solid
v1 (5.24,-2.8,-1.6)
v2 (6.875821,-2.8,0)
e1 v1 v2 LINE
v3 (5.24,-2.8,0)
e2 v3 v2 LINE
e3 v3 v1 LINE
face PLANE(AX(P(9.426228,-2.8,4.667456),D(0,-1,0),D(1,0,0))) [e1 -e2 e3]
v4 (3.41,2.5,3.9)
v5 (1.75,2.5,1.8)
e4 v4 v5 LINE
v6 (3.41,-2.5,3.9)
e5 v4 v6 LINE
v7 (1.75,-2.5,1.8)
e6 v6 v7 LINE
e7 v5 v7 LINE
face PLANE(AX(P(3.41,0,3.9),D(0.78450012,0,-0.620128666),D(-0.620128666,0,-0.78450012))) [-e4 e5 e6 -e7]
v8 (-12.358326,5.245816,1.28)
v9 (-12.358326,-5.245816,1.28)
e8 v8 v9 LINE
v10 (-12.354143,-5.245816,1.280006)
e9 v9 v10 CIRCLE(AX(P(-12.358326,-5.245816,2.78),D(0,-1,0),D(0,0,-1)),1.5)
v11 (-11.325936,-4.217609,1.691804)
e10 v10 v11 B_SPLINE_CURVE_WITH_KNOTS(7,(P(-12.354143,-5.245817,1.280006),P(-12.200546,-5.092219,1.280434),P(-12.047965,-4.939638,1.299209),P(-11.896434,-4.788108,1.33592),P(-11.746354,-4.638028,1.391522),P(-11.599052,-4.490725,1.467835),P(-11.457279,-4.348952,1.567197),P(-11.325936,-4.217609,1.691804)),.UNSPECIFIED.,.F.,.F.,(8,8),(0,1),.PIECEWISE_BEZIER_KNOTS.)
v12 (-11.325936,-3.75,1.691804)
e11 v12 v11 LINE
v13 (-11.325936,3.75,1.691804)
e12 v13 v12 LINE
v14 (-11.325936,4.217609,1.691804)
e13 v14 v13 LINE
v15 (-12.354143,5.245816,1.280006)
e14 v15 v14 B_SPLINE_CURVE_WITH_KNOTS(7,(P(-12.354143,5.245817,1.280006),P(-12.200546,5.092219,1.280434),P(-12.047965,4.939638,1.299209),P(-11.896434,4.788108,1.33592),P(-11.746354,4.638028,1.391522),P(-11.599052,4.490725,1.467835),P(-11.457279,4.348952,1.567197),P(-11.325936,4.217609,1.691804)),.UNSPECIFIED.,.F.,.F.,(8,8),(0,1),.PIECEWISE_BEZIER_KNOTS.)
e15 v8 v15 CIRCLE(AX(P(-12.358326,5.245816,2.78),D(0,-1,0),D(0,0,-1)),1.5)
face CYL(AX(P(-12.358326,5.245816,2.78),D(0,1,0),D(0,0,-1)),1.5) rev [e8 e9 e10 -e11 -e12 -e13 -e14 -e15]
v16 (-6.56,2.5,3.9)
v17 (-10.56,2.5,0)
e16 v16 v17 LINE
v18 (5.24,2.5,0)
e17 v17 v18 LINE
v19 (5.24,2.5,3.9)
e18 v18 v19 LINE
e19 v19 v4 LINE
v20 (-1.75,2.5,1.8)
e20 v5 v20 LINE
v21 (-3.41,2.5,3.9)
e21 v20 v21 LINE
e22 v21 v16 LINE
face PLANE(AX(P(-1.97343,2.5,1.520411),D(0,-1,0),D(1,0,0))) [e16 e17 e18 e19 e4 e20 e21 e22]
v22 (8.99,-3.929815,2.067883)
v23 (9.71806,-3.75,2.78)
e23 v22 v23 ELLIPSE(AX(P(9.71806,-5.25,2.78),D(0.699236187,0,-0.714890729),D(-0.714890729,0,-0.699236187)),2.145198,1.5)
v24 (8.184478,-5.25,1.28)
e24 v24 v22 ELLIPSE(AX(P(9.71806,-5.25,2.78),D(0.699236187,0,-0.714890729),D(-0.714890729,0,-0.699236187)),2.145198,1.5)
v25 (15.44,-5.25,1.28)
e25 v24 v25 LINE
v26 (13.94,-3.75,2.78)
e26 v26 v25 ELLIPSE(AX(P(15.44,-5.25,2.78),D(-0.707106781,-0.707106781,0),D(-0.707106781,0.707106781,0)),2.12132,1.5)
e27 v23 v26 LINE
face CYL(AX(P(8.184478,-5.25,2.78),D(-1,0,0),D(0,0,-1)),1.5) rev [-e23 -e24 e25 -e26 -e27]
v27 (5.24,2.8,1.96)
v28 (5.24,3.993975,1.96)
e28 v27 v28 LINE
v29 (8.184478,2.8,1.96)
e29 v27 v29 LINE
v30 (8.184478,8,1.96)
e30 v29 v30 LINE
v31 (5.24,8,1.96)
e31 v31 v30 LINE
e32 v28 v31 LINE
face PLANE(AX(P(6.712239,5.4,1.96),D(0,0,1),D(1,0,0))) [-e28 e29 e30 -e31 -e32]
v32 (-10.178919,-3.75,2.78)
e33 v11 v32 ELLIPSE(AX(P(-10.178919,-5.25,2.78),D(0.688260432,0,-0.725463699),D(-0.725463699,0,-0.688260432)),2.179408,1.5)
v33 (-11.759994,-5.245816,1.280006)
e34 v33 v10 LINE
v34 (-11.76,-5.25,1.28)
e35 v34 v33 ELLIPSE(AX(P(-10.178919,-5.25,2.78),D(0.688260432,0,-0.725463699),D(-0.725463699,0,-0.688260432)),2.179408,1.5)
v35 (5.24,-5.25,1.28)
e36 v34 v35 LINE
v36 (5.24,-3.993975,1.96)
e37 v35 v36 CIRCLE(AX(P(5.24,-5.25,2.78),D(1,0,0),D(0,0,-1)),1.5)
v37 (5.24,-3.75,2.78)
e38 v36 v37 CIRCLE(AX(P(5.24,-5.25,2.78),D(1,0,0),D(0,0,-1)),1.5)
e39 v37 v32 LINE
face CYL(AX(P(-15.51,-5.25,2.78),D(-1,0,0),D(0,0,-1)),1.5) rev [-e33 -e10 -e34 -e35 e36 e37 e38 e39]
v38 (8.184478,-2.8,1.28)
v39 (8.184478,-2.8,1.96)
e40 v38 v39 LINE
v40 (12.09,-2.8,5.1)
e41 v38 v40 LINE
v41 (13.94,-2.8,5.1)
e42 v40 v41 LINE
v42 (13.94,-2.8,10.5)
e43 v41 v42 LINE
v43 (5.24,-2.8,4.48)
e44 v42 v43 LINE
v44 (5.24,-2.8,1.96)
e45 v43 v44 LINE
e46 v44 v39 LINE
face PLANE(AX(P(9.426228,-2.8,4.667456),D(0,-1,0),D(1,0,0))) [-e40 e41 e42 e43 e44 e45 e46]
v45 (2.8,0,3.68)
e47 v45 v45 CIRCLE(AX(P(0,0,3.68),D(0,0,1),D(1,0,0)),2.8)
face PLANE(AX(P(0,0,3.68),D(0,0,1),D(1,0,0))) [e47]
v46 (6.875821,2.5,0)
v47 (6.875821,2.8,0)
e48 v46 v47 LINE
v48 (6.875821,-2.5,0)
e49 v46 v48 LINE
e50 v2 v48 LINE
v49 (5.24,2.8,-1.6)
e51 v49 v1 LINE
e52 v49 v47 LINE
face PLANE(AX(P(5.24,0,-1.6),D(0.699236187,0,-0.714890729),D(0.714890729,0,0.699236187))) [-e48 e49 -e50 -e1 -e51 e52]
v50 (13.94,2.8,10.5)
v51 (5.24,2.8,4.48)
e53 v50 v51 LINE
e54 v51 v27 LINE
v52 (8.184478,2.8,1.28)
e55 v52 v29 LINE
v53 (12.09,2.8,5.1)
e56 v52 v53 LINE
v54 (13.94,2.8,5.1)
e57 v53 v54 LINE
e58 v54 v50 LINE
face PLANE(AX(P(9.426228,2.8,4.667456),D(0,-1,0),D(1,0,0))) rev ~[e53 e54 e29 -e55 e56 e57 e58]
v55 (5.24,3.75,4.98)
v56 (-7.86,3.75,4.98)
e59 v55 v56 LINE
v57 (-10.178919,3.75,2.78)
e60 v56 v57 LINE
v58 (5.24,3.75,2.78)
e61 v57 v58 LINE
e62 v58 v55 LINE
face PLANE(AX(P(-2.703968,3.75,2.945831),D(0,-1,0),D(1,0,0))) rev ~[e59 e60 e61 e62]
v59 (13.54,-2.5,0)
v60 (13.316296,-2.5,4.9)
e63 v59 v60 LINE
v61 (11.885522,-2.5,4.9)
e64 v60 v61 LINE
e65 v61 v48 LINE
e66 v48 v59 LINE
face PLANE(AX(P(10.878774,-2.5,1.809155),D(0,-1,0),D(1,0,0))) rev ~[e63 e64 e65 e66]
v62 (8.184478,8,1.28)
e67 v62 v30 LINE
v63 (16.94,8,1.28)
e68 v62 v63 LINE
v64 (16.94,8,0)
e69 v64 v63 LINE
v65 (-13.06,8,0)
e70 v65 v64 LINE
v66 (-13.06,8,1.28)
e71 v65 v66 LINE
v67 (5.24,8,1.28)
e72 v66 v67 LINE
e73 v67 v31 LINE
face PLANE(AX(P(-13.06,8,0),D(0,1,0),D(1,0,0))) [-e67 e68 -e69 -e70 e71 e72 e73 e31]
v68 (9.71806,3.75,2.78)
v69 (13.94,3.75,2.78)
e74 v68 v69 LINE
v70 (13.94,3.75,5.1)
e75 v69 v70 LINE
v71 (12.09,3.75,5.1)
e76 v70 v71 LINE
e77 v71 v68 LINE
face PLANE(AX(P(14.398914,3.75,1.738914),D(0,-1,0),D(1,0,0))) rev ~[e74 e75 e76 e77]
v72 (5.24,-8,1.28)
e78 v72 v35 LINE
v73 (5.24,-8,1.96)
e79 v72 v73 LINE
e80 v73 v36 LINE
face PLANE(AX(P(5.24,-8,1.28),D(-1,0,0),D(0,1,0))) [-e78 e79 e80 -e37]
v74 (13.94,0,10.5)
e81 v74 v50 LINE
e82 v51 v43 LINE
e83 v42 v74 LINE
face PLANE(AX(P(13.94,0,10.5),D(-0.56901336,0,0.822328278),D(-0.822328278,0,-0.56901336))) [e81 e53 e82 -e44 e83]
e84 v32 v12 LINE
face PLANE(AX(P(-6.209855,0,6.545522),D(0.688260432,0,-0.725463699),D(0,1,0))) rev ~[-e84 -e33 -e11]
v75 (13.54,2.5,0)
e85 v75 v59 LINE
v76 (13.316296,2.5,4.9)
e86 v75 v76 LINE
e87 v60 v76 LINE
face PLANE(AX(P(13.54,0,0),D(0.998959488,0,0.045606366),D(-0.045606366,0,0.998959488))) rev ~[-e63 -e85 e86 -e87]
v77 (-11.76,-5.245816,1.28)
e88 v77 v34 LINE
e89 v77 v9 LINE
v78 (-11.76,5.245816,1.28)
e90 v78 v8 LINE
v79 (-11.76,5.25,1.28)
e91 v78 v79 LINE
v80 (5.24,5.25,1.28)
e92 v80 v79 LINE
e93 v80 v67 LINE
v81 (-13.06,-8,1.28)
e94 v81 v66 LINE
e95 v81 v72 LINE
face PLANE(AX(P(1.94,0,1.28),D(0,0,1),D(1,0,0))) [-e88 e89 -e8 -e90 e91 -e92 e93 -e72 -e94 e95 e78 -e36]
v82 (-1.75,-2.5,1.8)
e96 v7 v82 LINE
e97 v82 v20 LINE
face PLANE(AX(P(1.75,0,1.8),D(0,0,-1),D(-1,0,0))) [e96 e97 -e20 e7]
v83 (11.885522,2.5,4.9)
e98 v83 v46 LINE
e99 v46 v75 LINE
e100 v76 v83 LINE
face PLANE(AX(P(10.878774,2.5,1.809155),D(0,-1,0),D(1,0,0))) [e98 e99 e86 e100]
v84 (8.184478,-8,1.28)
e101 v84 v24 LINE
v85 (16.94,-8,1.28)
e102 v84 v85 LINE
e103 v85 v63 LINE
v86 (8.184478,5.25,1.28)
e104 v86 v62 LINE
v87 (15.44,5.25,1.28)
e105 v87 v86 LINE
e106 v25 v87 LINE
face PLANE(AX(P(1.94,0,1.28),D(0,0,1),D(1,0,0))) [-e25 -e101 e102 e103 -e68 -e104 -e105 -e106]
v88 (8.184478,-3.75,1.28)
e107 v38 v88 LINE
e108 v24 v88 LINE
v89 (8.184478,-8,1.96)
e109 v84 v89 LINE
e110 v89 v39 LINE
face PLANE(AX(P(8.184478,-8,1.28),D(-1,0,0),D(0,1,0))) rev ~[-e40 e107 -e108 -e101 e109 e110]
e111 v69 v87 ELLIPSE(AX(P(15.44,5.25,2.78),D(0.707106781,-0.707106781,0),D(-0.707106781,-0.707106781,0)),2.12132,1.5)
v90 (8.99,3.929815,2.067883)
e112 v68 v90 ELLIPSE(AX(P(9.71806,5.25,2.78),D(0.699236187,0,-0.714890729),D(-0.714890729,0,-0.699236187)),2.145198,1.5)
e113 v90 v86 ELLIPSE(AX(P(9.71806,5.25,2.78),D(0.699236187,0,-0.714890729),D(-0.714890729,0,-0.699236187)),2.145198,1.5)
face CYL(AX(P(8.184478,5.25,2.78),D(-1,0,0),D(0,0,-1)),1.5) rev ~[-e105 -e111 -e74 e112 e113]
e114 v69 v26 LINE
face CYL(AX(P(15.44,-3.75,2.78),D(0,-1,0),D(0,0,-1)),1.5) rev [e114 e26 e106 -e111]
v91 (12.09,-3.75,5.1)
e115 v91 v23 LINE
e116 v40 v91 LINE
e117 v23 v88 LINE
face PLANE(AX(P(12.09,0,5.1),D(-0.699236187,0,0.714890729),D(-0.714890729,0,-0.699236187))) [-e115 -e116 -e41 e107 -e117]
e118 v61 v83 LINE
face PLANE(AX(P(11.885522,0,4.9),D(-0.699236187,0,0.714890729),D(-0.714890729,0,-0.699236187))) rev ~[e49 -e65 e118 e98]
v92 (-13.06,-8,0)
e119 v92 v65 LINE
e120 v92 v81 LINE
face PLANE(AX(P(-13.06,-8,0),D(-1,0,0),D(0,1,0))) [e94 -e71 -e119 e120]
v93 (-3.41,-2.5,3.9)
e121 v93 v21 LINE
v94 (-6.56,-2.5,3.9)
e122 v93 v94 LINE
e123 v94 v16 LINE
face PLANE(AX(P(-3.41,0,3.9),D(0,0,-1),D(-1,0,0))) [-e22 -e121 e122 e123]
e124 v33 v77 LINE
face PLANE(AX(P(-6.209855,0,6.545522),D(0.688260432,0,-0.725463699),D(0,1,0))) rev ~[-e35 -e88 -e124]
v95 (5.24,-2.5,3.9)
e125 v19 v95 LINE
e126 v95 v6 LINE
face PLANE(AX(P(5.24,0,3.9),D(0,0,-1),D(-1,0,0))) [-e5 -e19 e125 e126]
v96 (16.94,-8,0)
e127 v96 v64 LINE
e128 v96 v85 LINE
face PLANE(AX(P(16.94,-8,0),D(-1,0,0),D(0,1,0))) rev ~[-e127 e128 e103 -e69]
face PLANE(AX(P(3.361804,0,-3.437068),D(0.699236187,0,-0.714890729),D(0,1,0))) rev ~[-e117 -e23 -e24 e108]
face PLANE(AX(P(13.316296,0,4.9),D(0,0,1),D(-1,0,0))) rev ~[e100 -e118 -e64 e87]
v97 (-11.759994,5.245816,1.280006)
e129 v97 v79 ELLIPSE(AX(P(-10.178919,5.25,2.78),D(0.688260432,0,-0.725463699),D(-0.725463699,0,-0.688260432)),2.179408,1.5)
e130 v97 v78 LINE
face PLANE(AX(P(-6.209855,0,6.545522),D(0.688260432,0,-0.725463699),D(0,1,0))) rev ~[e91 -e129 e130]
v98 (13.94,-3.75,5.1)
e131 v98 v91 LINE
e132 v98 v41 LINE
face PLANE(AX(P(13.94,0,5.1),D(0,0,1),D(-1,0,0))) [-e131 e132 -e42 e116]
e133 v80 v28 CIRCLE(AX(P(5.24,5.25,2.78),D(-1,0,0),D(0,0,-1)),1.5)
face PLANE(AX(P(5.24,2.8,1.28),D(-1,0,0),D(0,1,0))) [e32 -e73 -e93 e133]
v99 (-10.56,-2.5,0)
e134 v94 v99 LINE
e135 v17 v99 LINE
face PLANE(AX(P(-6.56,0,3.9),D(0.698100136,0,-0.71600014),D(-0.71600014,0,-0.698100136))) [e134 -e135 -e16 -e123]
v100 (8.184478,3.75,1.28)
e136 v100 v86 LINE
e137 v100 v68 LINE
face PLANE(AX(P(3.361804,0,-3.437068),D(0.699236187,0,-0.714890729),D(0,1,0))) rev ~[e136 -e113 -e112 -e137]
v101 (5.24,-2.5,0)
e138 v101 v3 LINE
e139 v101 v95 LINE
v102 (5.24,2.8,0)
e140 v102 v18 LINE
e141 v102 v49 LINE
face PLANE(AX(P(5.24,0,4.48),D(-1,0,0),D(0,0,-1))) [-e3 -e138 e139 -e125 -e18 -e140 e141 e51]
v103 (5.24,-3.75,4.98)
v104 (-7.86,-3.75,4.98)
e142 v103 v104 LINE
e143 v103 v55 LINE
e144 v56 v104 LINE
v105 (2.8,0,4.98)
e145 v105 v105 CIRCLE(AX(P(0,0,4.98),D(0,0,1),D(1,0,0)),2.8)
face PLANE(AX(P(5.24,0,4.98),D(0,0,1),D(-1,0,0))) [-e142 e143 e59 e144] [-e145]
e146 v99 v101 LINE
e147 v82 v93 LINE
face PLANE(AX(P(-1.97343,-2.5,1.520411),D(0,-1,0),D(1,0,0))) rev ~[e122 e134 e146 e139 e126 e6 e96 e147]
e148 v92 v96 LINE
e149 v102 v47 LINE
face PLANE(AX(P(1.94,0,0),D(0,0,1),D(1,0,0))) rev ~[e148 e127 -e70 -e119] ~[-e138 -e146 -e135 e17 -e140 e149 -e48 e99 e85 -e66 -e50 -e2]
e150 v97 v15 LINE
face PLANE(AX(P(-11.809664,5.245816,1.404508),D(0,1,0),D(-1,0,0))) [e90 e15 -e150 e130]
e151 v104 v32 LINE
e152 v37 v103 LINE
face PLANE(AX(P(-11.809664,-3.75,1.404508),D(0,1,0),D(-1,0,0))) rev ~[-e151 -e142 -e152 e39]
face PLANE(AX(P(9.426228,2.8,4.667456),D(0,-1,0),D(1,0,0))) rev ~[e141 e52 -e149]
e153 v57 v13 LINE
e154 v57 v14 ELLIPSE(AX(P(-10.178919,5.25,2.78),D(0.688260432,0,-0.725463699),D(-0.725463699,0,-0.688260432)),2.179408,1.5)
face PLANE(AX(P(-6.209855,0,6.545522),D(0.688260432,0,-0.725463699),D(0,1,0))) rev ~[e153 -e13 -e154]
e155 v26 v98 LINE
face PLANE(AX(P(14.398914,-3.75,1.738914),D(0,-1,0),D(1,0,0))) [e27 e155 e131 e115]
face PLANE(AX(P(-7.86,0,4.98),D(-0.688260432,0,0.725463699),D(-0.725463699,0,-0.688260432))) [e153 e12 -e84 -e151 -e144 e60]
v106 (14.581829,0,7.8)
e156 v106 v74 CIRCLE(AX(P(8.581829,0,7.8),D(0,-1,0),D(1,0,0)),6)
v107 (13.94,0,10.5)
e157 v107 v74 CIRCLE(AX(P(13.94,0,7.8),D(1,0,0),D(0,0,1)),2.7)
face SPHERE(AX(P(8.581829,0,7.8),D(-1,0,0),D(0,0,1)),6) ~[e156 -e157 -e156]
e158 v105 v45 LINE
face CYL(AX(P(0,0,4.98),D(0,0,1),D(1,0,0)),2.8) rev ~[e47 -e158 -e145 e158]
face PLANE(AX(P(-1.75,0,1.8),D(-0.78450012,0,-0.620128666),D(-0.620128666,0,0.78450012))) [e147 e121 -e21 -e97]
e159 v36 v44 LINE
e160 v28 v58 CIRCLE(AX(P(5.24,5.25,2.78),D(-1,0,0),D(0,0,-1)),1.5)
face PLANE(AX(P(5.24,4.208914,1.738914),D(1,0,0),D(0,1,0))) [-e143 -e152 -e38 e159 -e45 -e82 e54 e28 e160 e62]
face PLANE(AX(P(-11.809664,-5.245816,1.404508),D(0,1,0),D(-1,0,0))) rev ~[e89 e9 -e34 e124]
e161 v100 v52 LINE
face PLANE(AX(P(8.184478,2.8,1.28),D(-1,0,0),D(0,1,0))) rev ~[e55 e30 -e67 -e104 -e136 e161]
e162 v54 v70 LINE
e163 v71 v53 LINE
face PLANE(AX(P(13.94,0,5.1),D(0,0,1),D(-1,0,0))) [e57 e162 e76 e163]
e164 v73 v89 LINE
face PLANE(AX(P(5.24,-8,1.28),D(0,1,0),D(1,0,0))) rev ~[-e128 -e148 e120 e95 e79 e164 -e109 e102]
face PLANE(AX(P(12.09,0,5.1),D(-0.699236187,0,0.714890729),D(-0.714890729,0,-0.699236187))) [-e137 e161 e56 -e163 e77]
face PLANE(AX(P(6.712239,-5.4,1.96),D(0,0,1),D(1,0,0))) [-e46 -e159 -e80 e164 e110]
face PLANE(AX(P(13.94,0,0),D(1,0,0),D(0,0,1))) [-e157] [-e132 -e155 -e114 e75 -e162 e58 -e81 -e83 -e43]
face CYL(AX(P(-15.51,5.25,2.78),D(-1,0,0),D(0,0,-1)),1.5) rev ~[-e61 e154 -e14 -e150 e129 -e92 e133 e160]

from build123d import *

# Parameters (mm, degrees)
F0_W          = 30
F0_H          = 16
F1_DEPTH      = 1.28
F3_DEPTH      = 3.75
F5_DEPTH      = 2.8
F7_DEPTH      = 3.75
F8_W          = 2.9444776119
F8_H          = 5.2
F9_DEPTH      = 0.68
F10_T1_DEPTH  = 7.5
F10_T6_DEPTH  = 20.75
F10_T11_DEPTH = 24.5
F10_T16_DEPTH = 20.75
F10_T21_DEPTH = 24.5
F10_T26_DEPTH = 9.5055223881
F10_T31_DEPTH = 5.7555223881
F10_T36_DEPTH = 9.5055223881
F10_T41_DEPTH = 5.7555223881
F10_T47_DEPTH = 8.9958162388
F10_T51_DEPTH = 20.75
F10_T59_DEPTH = 20.75
F10_T64_DEPTH = 8.9958162388
F10_T71_DEPTH = 9.5055223881
F10_T76_DEPTH = 11.25
F10_T83_DEPTH = 11.25
F10_T87_DEPTH = 9.5055223881
F11_R         = 2.8
F12_DEPTH     = 1.3
F14_DEPTH     = 2.5


# Not quite as in the source:
# - a fillet or chamfer that OpenCascade refuses, or shapes differently, is made with other operations: its cross-section is extruded or revolved along the edge and cut away or added


with BuildPart() as f1:
    # F0 (on Top) → F1 (new body)
    with BuildSketch(Plane.XY):
        with Locations((1.94, 0)):
            Rectangle(F0_W, F0_H)
    extrude(amount=F1_DEPTH)

    # F2 (on Front) → F3 (join, symmetric)
    with BuildSketch(Plane.XZ):
        Polygon((5.24, 4.98), (-7.86, 4.98), (-11.76, 1.28), (5.24, 1.28), align=None)
    extrude(amount=F3_DEPTH, both=True)

    # F4 (on Front) → F5 (join, symmetric)
    with BuildSketch(Plane.XZ):
        Polygon((13.94, 10.5), (5.24, 4.48), (5.24, -1.6), (12.09, 5.1), (13.94, 5.1), align=None)
    extrude(amount=F5_DEPTH, both=True)

    # F6 (on Front) → F7 (join, symmetric)
    with BuildSketch(Plane.XZ):
        Polygon((13.94, 5.1), (12.09, 5.1), (6.8758208955, 0), (13.94, 0), align=None)
    extrude(amount=F7_DEPTH, both=True)

    # F8 (on face) → F9 (join)
    with BuildSketch(Plane.XY.offset(1.28)):
        with Locations((6.712238806, -5.4)):
            Rectangle(F8_W, F8_H)
        with Locations((6.712238806, 5.4)):
            Rectangle(F8_W, F8_H)
    extrude(amount=F9_DEPTH)

    # F10: fillet of radius 1.5 on 6 edges, made by hand

    # F10_s2 → F10_t1 (join)
    with BuildSketch(Plane.XZ.offset(-3.75)):
        with BuildLine():
            ThreePointArc((15.44, 1.28), (14.3793398282, 1.7193398282), (13.94, 2.78))
            Line((13.94, 2.78), (13.94, 1.28))
            Line((13.94, 1.28), (15.44, 1.28))
        make_face()
        with BuildLine():
            ThreePointArc((-12.3583264955, 1.28), (-11.802580745, 1.3867496058), (-11.3259358476, 1.6918044522))
            Line((-11.3259358476, 1.6918044522), (-11.76, 1.28))
            Line((-11.76, 1.28), (-12.3583264955, 1.28))
        make_face()
    extrude(amount=F10_T1_DEPTH)


with BuildPart() as f10_tool4:
    # F10_s5 → F10_t6 (new body)
    with BuildSketch(Plane.YZ.offset(-15.51)):
        with BuildLine():
            ThreePointArc((-5.25, 1.28), (-4.1893398282, 1.7193398282), (-3.75, 2.78))
            Line((-3.75, 2.78), (-3.75, 1.28))
            Line((-3.75, 1.28), (-5.25, 1.28))
        make_face()
    extrude(amount=F10_T6_DEPTH)

    split(bisect_by=Plane(origin=(-6.2098546713, 0, 6.5455224913), x_dir=(0, 1, 0), z_dir=(0.6882604319, 0, -0.7254636985)), keep=Keep.TOP)


with BuildPart() as f1_1:
    add(f1.part)

    # F10_t3: union F10_tool4
    add(f10_tool4.part)


with BuildPart() as f10_tool9:
    # F10_s10 → F10_t11 (new body)
    with BuildSketch(Plane.YZ.offset(-15.51)):
        with BuildLine():
            ThreePointArc((-5.25, 1.28), (-4.1893398282, 1.7193398282), (-3.75, 2.78))
            Line((-3.75, 2.78), (-3.75, 1.28))
            Line((-3.75, 1.28), (-5.25, 1.28))
        make_face()
    extrude(amount=F10_T11_DEPTH)

    split(bisect_by=Plane(origin=(3.361803676, 0, -3.4370679374), x_dir=(0, 1, 0), z_dir=(0.6992361874, 0, -0.7148907289)), keep=Keep.TOP)


with BuildPart() as f1_2:
    add(f1_1.part)

    # F10_t8: union F10_tool9
    add(f10_tool9.part)


with BuildPart() as f10_tool14:
    # F10_s15 → F10_t16 (new body)
    with BuildSketch(Plane.YZ.offset(-15.51)):
        with BuildLine():
            ThreePointArc((5.25, 1.28), (4.1893398282, 1.7193398282), (3.75, 2.78))
            Line((3.75, 2.78), (3.75, 1.28))
            Line((3.75, 1.28), (5.25, 1.28))
        make_face()
    extrude(amount=F10_T16_DEPTH)

    split(bisect_by=Plane(origin=(-6.2098546713, 0, 6.5455224913), x_dir=(0, 1, 0), z_dir=(0.6882604319, 0, -0.7254636985)), keep=Keep.TOP)


with BuildPart() as f1_3:
    add(f1_2.part)

    # F10_t13: union F10_tool14
    add(f10_tool14.part)


with BuildPart() as f10_tool19:
    # F10_s20 → F10_t21 (new body)
    with BuildSketch(Plane.YZ.offset(-15.51)):
        with BuildLine():
            ThreePointArc((5.25, 1.28), (4.1893398282, 1.7193398282), (3.75, 2.78))
            Line((3.75, 2.78), (3.75, 1.28))
            Line((3.75, 1.28), (5.25, 1.28))
        make_face()
    extrude(amount=F10_T21_DEPTH)

    split(bisect_by=Plane(origin=(3.361803676, 0, -3.4370679374), x_dir=(0, 1, 0), z_dir=(0.6992361874, 0, -0.7148907289)), keep=Keep.TOP)


with BuildPart() as f1_4:
    add(f1_3.part)

    # F10_t18: union F10_tool19
    add(f10_tool19.part)


with BuildPart() as f10_tool24:
    # F10_s25 → F10_t26 (new body)
    with BuildSketch(Plane.YZ.offset(4.4344776119)):
        with BuildLine():
            ThreePointArc((-5.25, 1.28), (-4.1893398282, 1.7193398282), (-3.75, 2.78))
            Line((-3.75, 2.78), (-3.75, 1.28))
            Line((-3.75, 1.28), (-5.25, 1.28))
        make_face()
    extrude(amount=F10_T26_DEPTH)

    split(bisect_by=Plane.YZ.offset(5.24), keep=Keep.BOTTOM)


with BuildPart() as f1_5:
    add(f1_4.part)

    # F10_t23: union F10_tool24
    add(f10_tool24.part)


with BuildPart() as f10_tool29:
    # F10_s30 → F10_t31 (new body)
    with BuildSketch(Plane.YZ.offset(8.1844776119)):
        with BuildLine():
            ThreePointArc((-5.25, 1.28), (-4.1893398282, 1.7193398282), (-3.75, 2.78))
            Line((-3.75, 2.78), (-3.75, 1.28))
            Line((-3.75, 1.28), (-5.25, 1.28))
        make_face()
    extrude(amount=F10_T31_DEPTH)

    split(bisect_by=Plane(origin=(3.361803676, 0, -3.4370679374), x_dir=(0, 1, 0), z_dir=(0.6992361874, 0, -0.7148907289)), keep=Keep.TOP)


with BuildPart() as f1_6:
    add(f1_5.part)

    # F10_t28: union F10_tool29
    add(f10_tool29.part)


with BuildPart() as f10_tool34:
    # F10_s35 → F10_t36 (new body)
    with BuildSketch(Plane.YZ.offset(4.4344776119)):
        with BuildLine():
            ThreePointArc((5.25, 1.28), (4.1893398282, 1.7193398282), (3.75, 2.78))
            Line((3.75, 2.78), (3.75, 1.28))
            Line((3.75, 1.28), (5.25, 1.28))
        make_face()
    extrude(amount=F10_T36_DEPTH)

    split(bisect_by=Plane.YZ.offset(5.24), keep=Keep.BOTTOM)


with BuildPart() as f1_7:
    add(f1_6.part)

    # F10_t33: union F10_tool34
    add(f10_tool34.part)


with BuildPart() as f10_tool39:
    # F10_s40 → F10_t41 (new body)
    with BuildSketch(Plane.YZ.offset(8.1844776119)):
        with BuildLine():
            ThreePointArc((5.25, 1.28), (4.1893398282, 1.7193398282), (3.75, 2.78))
            Line((3.75, 2.78), (3.75, 1.28))
            Line((3.75, 1.28), (5.25, 1.28))
        make_face()
    extrude(amount=F10_T41_DEPTH)

    split(bisect_by=Plane(origin=(3.361803676, 0, -3.4370679374), x_dir=(0, 1, 0), z_dir=(0.6992361874, 0, -0.7148907289)), keep=Keep.TOP)


with BuildPart() as f1_8:
    add(f1_7.part)

    # F10_t38: union F10_tool39
    add(f10_tool39.part)


with BuildPart() as f10_tool45:
    # F10_s46 → F10_t47 (new body)
    with BuildSketch(Plane.XZ.offset(-3.75)):
        with BuildLine():
            ThreePointArc((-12.3583264955, 1.28), (-11.802580745, 1.3867496058), (-11.3259358476, 1.6918044522))
            Line((-11.3259358476, 1.6918044522), (-11.76, 1.28))
            Line((-11.76, 1.28), (-12.3583264955, 1.28))
        make_face()
    extrude(amount=F10_T47_DEPTH)

    split(bisect_by=Plane.XZ.offset(3.75), keep=Keep.TOP)


with BuildPart() as f10_tool49:
    # F10_s50 → F10_t51 (new body)
    with BuildSketch(Plane.YZ.offset(-15.51)):
        with BuildLine():
            ThreePointArc((-5.25, 1.28), (-4.1893398282, 1.7193398282), (-3.75, 2.78))
            Line((-3.75, 2.78), (-3.75, 1.28))
            Line((-3.75, 1.28), (-5.25, 1.28))
        make_face()
    extrude(amount=F10_T51_DEPTH)

    split(bisect_by=Plane.YZ.offset(-13.06), keep=Keep.TOP)

    split(bisect_by=Plane(origin=(-6.2098546713, 0, 6.5455224913), x_dir=(0, 1, 0), z_dir=(-0.6882604319, 0, 0.7254636985)), keep=Keep.TOP)


with BuildPart() as f10_tool45_1:
    add(f10_tool45.part)

    # F10_t54: intersect F10_tool49
    add(f10_tool49.part, mode=Mode.INTERSECT)


with BuildPart() as f1_9:
    add(f1_8.part)

    # F10_t43: union F10_tool45
    add(f10_tool45_1.part)


with BuildPart() as f10_tool57:
    # F10_s58 → F10_t59 (new body)
    with BuildSketch(Plane.YZ.offset(-15.51)):
        with BuildLine():
            ThreePointArc((5.25, 1.28), (4.1893398282, 1.7193398282), (3.75, 2.78))
            Line((3.75, 2.78), (3.75, 1.28))
            Line((3.75, 1.28), (5.25, 1.28))
        make_face()
    extrude(amount=F10_T59_DEPTH)

    split(bisect_by=Plane.YZ.offset(-13.06), keep=Keep.TOP)

    split(bisect_by=Plane(origin=(-6.2098546713, 0, 6.5455224913), x_dir=(0, 1, 0), z_dir=(-0.6882604319, 0, 0.7254636985)), keep=Keep.TOP)


with BuildPart() as f10_tool62:
    # F10_s63 → F10_t64 (new body)
    with BuildSketch(Plane.XZ.offset(-5.2458162388)):
        with BuildLine():
            ThreePointArc((-12.3583264955, 1.28), (-11.802580745, 1.3867496058), (-11.3259358476, 1.6918044522))
            Line((-11.3259358476, 1.6918044522), (-11.76, 1.28))
            Line((-11.76, 1.28), (-12.3583264955, 1.28))
        make_face()
    extrude(amount=F10_T64_DEPTH)

    split(bisect_by=Plane.XZ.offset(-3.75), keep=Keep.BOTTOM)


with BuildPart() as f10_tool57_1:
    add(f10_tool57.part)

    # F10_t66: intersect F10_tool62
    add(f10_tool62.part, mode=Mode.INTERSECT)


with BuildPart() as f1_10:
    add(f1_9.part)

    # F10_t55: union F10_tool57
    add(f10_tool57_1.part)


with BuildPart() as f10_tool69:
    # F10_s70 → F10_t71 (new body)
    with BuildSketch(Plane.YZ.offset(8.1844776119)):
        with BuildLine():
            ThreePointArc((-5.25, 1.28), (-4.1893398282, 1.7193398282), (-3.75, 2.78))
            Line((-3.75, 2.78), (-3.75, 1.28))
            Line((-3.75, 1.28), (-5.25, 1.28))
        make_face()
    extrude(amount=F10_T71_DEPTH)

    split(bisect_by=Plane.YZ.offset(16.94), keep=Keep.BOTTOM)

    split(bisect_by=Plane.YZ.offset(13.94), keep=Keep.TOP)


with BuildPart() as f10_tool74:
    # F10_s75 → F10_t76 (new body)
    with BuildSketch(Plane.XZ.offset(7.5)):
        with BuildLine():
            ThreePointArc((15.44, 1.28), (14.3793398282, 1.7193398282), (13.94, 2.78))
            Line((13.94, 2.78), (13.94, 1.28))
            Line((13.94, 1.28), (15.44, 1.28))
        make_face()
    extrude(amount=-F10_T76_DEPTH)

    split(bisect_by=Plane.XZ.offset(3.75), keep=Keep.TOP)


with BuildPart() as f10_tool69_1:
    add(f10_tool69.part)

    # F10_t78: intersect F10_tool74
    add(f10_tool74.part, mode=Mode.INTERSECT)


with BuildPart() as f1_11:
    add(f1_10.part)

    # F10_t67: union F10_tool69
    add(f10_tool69_1.part)


with BuildPart() as f10_tool81:
    # F10_s82 → F10_t83 (new body)
    with BuildSketch(Plane.XZ.offset(3.75)):
        with BuildLine():
            ThreePointArc((15.44, 1.28), (14.3793398282, 1.7193398282), (13.94, 2.78))
            Line((13.94, 2.78), (13.94, 1.28))
            Line((13.94, 1.28), (15.44, 1.28))
        make_face()
    extrude(amount=-F10_T83_DEPTH)

    split(bisect_by=Plane.XZ.offset(-3.75), keep=Keep.BOTTOM)


with BuildPart() as f10_tool85:
    # F10_s86 → F10_t87 (new body)
    with BuildSketch(Plane.YZ.offset(8.1844776119)):
        with BuildLine():
            ThreePointArc((5.25, 1.28), (4.1893398282, 1.7193398282), (3.75, 2.78))
            Line((3.75, 2.78), (3.75, 1.28))
            Line((3.75, 1.28), (5.25, 1.28))
        make_face()
    extrude(amount=F10_T87_DEPTH)

    split(bisect_by=Plane.YZ.offset(16.94), keep=Keep.BOTTOM)

    split(bisect_by=Plane.YZ.offset(13.94), keep=Keep.TOP)


with BuildPart() as f10_tool81_1:
    add(f10_tool81.part)

    # F10_t90: intersect F10_tool85
    add(f10_tool85.part, mode=Mode.INTERSECT)


with BuildPart() as f1_12:
    add(f1_11.part)

    # F10_t79: union F10_tool81
    add(f10_tool81_1.part)

    # F11 (on face) → F12 (cut)
    with BuildSketch(Plane.XY.offset(4.98)):
        Circle(F11_R)
    extrude(amount=-F12_DEPTH, mode=Mode.SUBTRACT)

    # F13 (on Front) → F14 (cut, symmetric)
    with BuildSketch(Plane.XZ):
        Polygon((-6.56, 3.9), (-10.56, 0), (5.24, 0), (5.24, 3.9), (3.41, 3.9), (1.75, 1.8), (-1.75, 1.8), (-3.41, 3.9), align=None)
        Polygon((11.8855223881, 4.9), (6.8758208955, 0), (13.54, 0), (13.316296041, 4.9), align=None)
    extrude(amount=F14_DEPTH, both=True, mode=Mode.SUBTRACT)

    # F15 (on Front) → F16 (revolve)
    with BuildSketch(Plane.XZ):
        with BuildLine():
            Line((13.94, 7.8), (14.5818286702, 7.8))
            ThreePointArc((14.5818286702, 7.8), (14.4191665899, 9.1876188275), (13.94, 10.5))
            Line((13.94, 10.5), (13.94, 7.8))
        make_face()
    revolve(axis=Axis((14.2609143351, 0, 7.8), (1, 0, 0)))


solid = f1_12.part
